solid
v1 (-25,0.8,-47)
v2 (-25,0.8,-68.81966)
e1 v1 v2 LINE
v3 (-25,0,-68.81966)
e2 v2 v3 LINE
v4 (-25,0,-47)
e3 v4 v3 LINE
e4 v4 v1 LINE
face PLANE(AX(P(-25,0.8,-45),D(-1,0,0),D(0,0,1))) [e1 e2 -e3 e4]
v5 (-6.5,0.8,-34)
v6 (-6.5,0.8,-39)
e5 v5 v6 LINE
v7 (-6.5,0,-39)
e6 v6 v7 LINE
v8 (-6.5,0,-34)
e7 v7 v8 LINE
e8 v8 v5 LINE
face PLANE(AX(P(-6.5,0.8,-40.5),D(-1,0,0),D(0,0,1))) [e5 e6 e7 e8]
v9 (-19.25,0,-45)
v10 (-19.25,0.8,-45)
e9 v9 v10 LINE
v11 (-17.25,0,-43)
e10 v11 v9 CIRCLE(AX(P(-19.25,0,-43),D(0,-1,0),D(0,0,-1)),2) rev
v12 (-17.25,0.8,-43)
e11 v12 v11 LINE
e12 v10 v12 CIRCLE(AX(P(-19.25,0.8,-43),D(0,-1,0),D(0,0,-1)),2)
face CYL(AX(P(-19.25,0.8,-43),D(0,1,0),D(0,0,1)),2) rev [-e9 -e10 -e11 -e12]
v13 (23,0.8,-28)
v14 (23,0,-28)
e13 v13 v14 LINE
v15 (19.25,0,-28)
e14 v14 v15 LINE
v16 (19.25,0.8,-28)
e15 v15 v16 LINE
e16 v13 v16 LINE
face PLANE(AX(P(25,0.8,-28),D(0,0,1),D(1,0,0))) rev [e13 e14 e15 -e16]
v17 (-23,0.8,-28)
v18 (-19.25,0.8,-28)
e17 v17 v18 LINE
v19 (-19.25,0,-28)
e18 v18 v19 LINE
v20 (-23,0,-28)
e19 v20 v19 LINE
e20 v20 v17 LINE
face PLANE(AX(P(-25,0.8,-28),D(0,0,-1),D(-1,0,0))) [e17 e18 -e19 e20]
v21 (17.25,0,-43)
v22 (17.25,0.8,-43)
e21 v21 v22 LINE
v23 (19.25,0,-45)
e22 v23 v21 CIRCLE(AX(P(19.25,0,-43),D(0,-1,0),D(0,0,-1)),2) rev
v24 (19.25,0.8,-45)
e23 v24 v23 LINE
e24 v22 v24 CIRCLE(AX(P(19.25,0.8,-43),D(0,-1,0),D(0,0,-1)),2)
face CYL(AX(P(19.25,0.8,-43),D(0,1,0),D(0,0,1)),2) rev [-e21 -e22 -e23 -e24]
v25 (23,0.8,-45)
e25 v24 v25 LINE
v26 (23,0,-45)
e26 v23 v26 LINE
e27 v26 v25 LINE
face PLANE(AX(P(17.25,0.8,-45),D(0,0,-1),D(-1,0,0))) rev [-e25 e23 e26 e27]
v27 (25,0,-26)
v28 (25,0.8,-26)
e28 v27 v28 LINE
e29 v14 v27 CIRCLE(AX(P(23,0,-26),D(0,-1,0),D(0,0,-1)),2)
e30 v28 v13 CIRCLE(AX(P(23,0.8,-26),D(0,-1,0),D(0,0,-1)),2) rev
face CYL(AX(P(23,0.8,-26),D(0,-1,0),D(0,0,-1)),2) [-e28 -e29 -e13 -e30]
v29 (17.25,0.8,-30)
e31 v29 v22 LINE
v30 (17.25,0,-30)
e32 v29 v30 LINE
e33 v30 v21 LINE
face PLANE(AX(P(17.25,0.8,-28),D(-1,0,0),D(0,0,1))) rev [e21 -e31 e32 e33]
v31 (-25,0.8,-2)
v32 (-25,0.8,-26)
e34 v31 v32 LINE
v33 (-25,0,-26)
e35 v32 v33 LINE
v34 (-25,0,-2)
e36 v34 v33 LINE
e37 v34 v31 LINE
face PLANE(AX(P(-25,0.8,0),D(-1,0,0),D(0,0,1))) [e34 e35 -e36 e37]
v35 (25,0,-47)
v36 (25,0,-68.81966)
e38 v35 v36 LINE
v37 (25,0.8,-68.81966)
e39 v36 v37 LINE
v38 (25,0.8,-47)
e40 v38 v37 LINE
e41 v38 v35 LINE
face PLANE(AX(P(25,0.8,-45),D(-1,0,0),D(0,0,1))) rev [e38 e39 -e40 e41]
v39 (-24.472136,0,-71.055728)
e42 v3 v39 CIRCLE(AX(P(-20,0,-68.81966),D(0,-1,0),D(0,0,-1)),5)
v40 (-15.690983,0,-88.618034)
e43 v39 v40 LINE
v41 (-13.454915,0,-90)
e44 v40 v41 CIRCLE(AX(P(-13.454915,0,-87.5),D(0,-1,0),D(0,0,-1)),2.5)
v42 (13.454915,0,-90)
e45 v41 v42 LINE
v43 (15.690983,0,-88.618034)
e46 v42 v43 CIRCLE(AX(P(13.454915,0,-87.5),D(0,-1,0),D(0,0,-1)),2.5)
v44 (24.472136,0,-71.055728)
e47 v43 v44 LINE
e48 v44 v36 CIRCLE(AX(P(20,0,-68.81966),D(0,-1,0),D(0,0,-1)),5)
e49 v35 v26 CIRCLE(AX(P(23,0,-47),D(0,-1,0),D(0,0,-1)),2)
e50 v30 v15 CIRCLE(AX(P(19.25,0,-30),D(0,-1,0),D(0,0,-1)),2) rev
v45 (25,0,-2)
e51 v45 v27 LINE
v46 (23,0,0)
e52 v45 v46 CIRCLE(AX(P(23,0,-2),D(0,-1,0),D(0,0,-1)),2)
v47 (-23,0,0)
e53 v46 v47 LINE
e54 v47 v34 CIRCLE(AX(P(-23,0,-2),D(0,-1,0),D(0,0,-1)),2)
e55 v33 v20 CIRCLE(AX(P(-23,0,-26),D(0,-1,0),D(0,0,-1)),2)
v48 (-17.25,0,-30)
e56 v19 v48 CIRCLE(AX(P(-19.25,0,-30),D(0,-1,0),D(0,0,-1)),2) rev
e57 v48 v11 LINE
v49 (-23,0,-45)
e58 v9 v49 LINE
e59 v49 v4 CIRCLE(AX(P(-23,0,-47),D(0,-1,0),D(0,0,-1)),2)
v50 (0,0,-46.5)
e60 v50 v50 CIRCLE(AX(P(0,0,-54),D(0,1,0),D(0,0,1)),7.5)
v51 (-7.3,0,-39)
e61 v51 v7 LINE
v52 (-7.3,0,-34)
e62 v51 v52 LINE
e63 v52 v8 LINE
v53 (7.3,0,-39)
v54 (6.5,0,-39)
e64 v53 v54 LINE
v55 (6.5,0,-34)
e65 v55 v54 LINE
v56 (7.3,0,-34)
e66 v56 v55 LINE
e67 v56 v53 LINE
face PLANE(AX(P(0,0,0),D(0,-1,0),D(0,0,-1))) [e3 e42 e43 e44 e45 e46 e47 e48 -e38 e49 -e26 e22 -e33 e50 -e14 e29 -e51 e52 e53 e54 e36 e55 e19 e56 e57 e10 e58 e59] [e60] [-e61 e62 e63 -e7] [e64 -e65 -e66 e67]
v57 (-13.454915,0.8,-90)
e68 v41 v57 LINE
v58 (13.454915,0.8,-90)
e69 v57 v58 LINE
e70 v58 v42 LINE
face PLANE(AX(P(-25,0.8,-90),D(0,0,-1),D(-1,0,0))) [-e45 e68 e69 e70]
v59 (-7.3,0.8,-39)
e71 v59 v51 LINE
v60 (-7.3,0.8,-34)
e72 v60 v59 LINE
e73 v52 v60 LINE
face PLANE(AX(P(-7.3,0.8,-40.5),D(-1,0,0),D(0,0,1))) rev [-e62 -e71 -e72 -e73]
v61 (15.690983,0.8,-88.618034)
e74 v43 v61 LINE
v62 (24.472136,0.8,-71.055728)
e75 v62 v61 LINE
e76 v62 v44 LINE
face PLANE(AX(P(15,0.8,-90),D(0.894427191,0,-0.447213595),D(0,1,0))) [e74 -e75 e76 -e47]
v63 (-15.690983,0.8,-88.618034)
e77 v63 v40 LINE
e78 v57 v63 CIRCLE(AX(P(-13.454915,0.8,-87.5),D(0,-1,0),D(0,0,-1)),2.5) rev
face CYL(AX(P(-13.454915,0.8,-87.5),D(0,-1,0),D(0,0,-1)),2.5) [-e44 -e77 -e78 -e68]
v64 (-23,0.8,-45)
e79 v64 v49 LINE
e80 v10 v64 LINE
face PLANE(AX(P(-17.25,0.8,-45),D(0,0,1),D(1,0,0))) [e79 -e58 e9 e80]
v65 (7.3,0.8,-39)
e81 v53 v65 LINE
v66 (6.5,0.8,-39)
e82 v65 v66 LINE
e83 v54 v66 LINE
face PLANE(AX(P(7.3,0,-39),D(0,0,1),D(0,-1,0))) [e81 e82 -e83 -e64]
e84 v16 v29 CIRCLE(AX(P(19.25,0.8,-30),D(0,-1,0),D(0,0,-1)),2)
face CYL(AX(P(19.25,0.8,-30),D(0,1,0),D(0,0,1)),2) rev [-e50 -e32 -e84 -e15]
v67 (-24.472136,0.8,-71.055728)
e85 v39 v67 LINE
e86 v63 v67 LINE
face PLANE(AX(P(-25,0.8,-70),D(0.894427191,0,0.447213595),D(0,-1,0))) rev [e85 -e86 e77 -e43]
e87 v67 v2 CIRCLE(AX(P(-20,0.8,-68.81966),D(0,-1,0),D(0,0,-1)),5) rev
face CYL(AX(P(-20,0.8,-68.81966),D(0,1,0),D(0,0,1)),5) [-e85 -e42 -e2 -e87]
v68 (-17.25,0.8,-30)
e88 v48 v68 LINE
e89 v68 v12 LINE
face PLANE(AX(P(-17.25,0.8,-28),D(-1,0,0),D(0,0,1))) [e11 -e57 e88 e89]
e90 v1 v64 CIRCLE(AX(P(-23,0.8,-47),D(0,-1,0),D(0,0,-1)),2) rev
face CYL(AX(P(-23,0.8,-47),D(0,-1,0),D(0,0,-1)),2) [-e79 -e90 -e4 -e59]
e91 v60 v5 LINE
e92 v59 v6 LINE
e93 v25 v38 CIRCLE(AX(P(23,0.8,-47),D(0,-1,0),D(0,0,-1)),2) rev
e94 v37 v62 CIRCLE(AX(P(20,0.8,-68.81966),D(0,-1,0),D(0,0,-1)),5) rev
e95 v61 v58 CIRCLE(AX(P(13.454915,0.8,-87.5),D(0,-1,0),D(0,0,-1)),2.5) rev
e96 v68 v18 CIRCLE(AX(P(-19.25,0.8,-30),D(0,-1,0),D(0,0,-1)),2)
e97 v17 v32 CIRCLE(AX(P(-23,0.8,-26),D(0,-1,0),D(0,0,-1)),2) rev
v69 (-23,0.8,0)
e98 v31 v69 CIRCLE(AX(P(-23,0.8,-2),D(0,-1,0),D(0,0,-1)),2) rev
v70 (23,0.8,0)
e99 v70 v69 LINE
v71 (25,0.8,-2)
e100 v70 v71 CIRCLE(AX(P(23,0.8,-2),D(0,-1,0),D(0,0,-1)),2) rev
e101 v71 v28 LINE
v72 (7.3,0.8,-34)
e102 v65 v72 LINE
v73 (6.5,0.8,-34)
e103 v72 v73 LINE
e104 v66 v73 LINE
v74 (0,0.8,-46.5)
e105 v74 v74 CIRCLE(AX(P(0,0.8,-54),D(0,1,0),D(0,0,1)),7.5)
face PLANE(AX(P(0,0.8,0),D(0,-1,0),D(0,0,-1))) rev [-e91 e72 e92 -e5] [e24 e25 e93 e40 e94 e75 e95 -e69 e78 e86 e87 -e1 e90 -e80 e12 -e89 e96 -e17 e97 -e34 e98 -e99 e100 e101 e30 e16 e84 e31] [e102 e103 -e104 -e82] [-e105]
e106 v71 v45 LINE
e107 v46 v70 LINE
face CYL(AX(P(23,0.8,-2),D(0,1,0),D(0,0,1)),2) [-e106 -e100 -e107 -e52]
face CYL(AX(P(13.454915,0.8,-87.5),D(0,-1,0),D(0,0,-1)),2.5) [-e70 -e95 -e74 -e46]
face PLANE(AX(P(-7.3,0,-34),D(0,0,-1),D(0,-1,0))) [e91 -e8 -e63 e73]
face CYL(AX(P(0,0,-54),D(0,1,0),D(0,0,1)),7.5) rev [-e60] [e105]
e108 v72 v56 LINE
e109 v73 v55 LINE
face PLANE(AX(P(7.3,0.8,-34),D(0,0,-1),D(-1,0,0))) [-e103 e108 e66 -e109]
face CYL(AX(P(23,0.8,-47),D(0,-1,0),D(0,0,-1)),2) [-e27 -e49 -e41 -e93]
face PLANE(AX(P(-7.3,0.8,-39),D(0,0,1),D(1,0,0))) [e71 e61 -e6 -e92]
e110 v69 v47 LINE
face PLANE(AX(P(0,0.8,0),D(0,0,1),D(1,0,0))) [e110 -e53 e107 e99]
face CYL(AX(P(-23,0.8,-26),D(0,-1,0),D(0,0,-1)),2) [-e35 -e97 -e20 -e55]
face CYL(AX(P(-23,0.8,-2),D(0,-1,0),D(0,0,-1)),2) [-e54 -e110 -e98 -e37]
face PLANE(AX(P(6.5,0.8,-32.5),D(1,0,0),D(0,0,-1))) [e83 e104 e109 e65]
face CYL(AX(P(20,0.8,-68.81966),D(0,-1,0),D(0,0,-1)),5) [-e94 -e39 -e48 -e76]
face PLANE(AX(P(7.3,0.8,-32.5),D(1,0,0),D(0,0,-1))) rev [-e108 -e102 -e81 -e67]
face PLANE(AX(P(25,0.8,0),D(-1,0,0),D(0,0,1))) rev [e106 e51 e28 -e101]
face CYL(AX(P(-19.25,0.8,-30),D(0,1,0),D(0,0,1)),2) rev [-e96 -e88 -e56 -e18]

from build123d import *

# Parameters (mm, degrees)
RESSALTO_EXTRUS_O1_DEPTH = 0.8
FILETE6_R                = 2
CHANFRO3_SIZE            = 10
CHANFRO3_SIZE2           = 20
CHANFRO4_SIZE            = 20
CHANFRO4_SIZE2           = 10
FILETE7_R                = 2.5
ESBO_O7_R                = 7.5
CORTE_EXTRUS_O1_DEPTH    = 0.8
CAVIDADE1_START          = -7.3
CAVIDADE1_OUTLINE_W      = 0.8
CAVIDADE1_OUTLINE_H      = 5
CAVIDADE1_DEPTH          = 0.8
CAVIDADE1_START_2        = 6.5
CAVIDADE1_2_OUTLINE_W    = 0.8
CAVIDADE1_2_OUTLINE_H    = 5
CAVIDADE1_2_DEPTH        = 0.8
FILETE8_R                = 5


# Read off the part's stored shape, not the designer's step: Cavidade1
with BuildPart() as part:
    # Esboço1 → Ressalto-extrusão1 (new body)
    with BuildSketch(Plane(origin=(0, 0, 0), x_dir=(1, 0, 0), z_dir=(0, 1, 0))):
        Polygon((-17.25, 45), (-25, 45), (-25, 90), (0, 90), (0, 0), (-25, 0), (-25, 28), (-17.25, 28), align=None)
    ressalto_extrus_o1 = extrude(amount=RESSALTO_EXTRUS_O1_DEPTH)

    # Espelhar8: Ressalto-extrusão1 across plane
    add(ressalto_extrus_o1.mirror(Plane(origin=(0, 0, 0), x_dir=(0, 0, 1), z_dir=(1, 0, 0))))

    # Filete6
    filete6_edges = [part.edges().sort_by_distance(p)[0] for p in [
        (-25, 0.4, -45),
        (-17.25, 0.4, -45),
        (-17.25, 0.4, -28),
        (-25, 0.4, -28),
        (-25, 0.4, 0),
        (25, 0.4, 0),
        (25, 0.4, -28),
        (17.25, 0.4, -28),
        (17.25, 0.4, -45),
        (25, 0.4, -45),
    ]]
    fillet(filete6_edges, radius=FILETE6_R)

    # Chanfro3
    chanfro3_edges = [part.edges().sort_by_distance(p)[0] for p in [
        (-25, 0.4, -90),
    ]]
    chanfro3_side = [part.faces().sort_by_distance(p)[0] for p in [
        (0, 0.4, -90),
    ]]
    chamfer(chanfro3_edges, length=CHANFRO3_SIZE, length2=CHANFRO3_SIZE2, reference=chanfro3_side[0])

    # Chanfro4
    chanfro4_edges = [part.edges().sort_by_distance(p)[0] for p in [
        (25, 0.4, -90),
    ]]
    chanfro4_side = [part.faces().sort_by_distance(p)[0] for p in [
        (25, 0.4, -68.5),
    ]]
    chamfer(chanfro4_edges, length=CHANFRO4_SIZE, length2=CHANFRO4_SIZE2, reference=chanfro4_side[0])

    # Filete7
    filete7_edges = [part.edges().sort_by_distance(p)[0] for p in [
        (-15, 0.4, -90),
        (15, 0.4, -90),
    ]]
    fillet(filete7_edges, radius=FILETE7_R)

    # Esboço7 → Corte-extrusão1 (cut)
    with BuildSketch(Plane(origin=(0, 0.8, 0), x_dir=(1, 0, 0), z_dir=(0, 1, 0))):
        with Locations(Location((0, 54, 0), (0, 0, 270))):
            Circle(ESBO_O7_R)
    extrude(amount=-CORTE_EXTRUS_O1_DEPTH, mode=Mode.SUBTRACT)

    # Cavidade1 outline → Cavidade1 (cut)
    with BuildSketch(Plane.YZ.offset(CAVIDADE1_START)):
        with Locations((0.4, -36.5)):
            Rectangle(CAVIDADE1_OUTLINE_W, CAVIDADE1_OUTLINE_H)
    extrude(amount=CAVIDADE1_DEPTH, mode=Mode.SUBTRACT)

    # Cavidade1 2 outline → Cavidade1 2 (cut)
    with BuildSketch(Plane.YZ.offset(CAVIDADE1_START_2)):
        with Locations((0.4, -36.5)):
            Rectangle(CAVIDADE1_2_OUTLINE_W, CAVIDADE1_2_OUTLINE_H)
    extrude(amount=CAVIDADE1_2_DEPTH, mode=Mode.SUBTRACT)

    # Filete8
    filete8_edges = [part.edges().sort_by_distance(p)[0] for p in [
        (-25, 0.4, -70),
        (25, 0.4, -70),
    ]]
    fillet(filete8_edges, radius=FILETE8_R)


solid = part.part
